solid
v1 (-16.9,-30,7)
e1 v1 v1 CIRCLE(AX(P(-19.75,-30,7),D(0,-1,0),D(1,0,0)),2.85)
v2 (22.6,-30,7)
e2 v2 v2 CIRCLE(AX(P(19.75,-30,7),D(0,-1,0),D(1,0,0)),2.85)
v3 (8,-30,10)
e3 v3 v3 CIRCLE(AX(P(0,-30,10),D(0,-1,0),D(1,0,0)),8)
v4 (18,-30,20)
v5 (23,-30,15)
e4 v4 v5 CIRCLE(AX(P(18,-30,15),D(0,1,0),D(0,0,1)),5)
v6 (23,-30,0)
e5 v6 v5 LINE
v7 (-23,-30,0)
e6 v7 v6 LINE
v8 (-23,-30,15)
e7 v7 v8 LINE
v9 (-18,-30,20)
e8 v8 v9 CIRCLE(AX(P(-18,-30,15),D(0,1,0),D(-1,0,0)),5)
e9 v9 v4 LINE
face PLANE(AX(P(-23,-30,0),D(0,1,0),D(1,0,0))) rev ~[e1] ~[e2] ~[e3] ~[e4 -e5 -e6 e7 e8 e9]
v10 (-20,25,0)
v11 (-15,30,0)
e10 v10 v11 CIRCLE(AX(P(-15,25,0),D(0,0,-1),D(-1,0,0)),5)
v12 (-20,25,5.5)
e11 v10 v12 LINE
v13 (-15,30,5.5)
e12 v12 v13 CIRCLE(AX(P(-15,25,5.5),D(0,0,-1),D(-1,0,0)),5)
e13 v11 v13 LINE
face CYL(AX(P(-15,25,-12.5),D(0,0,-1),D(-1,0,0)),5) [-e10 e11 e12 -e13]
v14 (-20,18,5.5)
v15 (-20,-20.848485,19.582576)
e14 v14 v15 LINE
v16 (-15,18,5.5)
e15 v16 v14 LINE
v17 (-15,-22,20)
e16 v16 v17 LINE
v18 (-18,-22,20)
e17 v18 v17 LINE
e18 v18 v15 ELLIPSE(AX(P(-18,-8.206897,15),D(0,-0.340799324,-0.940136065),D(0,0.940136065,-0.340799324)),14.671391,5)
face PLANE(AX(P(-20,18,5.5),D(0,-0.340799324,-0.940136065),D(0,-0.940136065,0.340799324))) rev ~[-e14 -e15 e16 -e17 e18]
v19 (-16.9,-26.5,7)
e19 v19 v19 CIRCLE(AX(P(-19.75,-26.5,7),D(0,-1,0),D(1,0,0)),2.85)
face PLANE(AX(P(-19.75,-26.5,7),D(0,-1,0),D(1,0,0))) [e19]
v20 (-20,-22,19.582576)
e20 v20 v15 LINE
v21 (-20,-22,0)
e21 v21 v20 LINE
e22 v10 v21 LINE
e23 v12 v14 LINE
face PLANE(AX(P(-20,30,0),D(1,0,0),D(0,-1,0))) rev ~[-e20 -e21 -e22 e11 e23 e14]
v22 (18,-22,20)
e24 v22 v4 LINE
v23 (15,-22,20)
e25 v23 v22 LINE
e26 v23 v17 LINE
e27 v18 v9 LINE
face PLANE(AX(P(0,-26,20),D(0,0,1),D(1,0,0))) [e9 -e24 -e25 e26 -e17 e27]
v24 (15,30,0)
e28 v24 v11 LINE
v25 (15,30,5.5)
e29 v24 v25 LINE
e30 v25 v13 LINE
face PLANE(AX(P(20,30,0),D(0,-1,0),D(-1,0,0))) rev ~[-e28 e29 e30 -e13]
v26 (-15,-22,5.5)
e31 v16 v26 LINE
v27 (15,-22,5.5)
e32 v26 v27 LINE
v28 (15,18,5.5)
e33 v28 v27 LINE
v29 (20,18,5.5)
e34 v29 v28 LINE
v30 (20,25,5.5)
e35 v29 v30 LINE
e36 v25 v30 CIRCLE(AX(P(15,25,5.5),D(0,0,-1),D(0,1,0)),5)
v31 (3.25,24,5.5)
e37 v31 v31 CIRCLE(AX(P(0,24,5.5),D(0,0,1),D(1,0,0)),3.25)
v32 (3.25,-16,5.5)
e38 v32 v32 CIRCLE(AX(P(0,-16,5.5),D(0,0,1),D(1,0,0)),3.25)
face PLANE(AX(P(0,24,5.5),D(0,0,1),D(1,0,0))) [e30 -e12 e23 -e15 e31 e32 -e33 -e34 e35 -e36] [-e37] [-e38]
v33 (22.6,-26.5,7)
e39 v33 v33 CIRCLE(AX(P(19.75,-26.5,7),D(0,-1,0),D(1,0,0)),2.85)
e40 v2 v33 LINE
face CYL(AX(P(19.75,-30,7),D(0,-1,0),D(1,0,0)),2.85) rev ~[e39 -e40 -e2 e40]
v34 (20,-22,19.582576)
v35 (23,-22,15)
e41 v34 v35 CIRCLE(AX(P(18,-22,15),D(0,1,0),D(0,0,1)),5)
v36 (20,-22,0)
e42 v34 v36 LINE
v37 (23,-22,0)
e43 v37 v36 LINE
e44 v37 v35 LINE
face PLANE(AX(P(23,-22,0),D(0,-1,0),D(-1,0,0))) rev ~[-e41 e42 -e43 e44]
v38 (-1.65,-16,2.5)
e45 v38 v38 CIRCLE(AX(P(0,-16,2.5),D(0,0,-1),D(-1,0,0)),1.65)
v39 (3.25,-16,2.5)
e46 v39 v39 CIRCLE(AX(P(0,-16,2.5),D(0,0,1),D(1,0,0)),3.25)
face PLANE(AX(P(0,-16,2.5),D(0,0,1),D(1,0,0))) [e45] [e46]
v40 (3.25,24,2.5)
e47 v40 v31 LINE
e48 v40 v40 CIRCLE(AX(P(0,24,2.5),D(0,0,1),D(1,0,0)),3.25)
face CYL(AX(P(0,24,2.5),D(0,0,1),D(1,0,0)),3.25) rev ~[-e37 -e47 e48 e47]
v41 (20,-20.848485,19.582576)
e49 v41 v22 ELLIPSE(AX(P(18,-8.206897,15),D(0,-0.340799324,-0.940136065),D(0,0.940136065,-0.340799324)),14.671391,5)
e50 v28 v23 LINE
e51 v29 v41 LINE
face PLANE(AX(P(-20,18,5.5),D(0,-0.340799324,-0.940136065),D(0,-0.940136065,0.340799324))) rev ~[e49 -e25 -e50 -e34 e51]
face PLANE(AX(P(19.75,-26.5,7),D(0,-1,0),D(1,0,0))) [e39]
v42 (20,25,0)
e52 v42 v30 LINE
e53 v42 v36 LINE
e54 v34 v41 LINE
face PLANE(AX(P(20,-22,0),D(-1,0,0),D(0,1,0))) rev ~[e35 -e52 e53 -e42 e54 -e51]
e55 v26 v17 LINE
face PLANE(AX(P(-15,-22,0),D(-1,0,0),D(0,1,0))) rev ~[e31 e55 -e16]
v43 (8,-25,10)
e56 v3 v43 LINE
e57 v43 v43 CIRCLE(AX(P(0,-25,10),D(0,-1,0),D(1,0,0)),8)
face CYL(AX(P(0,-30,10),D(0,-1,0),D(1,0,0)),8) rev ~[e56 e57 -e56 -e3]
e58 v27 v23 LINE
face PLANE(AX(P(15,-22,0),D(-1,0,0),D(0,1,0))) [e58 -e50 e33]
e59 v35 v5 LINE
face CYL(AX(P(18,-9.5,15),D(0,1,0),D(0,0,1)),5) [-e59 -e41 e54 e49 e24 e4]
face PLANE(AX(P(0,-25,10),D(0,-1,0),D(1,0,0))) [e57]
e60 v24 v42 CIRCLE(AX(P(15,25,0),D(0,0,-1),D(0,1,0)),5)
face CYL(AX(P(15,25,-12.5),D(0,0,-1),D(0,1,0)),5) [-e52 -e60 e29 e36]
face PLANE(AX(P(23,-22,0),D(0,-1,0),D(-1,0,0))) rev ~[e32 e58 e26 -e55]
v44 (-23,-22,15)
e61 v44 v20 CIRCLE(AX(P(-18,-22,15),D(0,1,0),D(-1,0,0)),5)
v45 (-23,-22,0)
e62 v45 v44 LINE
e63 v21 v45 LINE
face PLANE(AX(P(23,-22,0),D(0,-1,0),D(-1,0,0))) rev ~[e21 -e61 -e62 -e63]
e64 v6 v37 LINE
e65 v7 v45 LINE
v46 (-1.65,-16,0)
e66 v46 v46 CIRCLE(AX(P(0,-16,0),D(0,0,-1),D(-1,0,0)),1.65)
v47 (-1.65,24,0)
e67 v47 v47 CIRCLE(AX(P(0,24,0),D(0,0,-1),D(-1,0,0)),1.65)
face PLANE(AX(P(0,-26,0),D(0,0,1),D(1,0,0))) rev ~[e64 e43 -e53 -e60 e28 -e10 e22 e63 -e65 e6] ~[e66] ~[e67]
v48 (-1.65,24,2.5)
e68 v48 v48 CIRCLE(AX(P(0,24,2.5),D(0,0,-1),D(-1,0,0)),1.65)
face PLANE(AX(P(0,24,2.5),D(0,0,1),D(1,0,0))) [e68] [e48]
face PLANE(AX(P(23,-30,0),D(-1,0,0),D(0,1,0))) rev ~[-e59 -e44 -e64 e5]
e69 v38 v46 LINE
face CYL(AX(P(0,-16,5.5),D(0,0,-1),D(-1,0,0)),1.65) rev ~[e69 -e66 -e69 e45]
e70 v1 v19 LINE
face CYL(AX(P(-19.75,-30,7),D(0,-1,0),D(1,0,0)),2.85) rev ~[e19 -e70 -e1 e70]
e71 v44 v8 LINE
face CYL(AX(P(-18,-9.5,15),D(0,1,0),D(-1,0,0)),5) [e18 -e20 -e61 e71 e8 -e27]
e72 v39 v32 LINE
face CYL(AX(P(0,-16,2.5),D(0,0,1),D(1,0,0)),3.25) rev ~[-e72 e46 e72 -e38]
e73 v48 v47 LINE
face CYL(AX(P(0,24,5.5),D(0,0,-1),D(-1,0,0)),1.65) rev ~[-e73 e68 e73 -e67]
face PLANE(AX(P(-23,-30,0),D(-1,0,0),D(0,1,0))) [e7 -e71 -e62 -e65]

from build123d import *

# Parameters (mm, degrees)
F0_W           = 3
F0_H           = 8
F1_DEPTH       = 20
F0_W_2         = 30
F0_H_2         = 12
F0_H_3         = 40
F0_W_3         = 5
F2_DEPTH       = 5.5
F3_DEPTH       = 20
F5_DEPTH       = 43.001
F7_D           = 3.3
F7_DEPTH       = 13.5002857143
F7_CBORE_D     = 6.5
F7_CBORE_DEPTH = 3
F7_TIP         = 0.9914200214
F8_R           = 8
F9_DEPTH       = 5
F8_R_2         = 2.85
F10_DEPTH      = 3.5
F11_T1_DEPTH   = 30.5
F11_T3_DEPTH   = 33


# Not quite as in the source:
# - a fillet or chamfer that OpenCascade refuses, or shapes differently, is made with other operations: its cross-section is extruded or revolved along the edge and cut away or added


with BuildPart() as f1:
    # F0 (on Top) → F1 (new body)
    with BuildSketch(Plane.XY):
        Polygon((20, -30), (20, -22), (15, -22), (-15, -22), (-20, -22), (-20, -30), align=None)
        with Locations((-21.5, -26)):
            Rectangle(F0_W, F0_H)
        with Locations((21.5, -26)):
            Rectangle(F0_W, F0_H)
    extrude(amount=F1_DEPTH)

    # F0 (on Top) → F2 (join)
    with BuildSketch(Plane.XY):
        with Locations((0, 24)):
            Rectangle(F0_W_2, F0_H_2)
        with Locations((0, -2)):
            Rectangle(F0_W_2, F0_H_3)
        with Locations((-17.5, 24)):
            Rectangle(F0_W_3, F0_H_2)
        with Locations((-17.5, -2)):
            Rectangle(F0_W_3, F0_H_3)
        with Locations((17.5, 24)):
            Rectangle(F0_W_3, F0_H_2)
        with Locations((17.5, -2)):
            Rectangle(F0_W_3, F0_H_3)
    extrude(amount=F2_DEPTH)

    # F0 (on Top) → F3 (join)
    with BuildSketch(Plane.XY):
        with Locations((-17.5, -2)):
            Rectangle(F0_W_3, F0_H_3)
        with Locations((17.5, -2)):
            Rectangle(F0_W_3, F0_H_3)
    extrude(amount=F3_DEPTH)

    # F4 (on face) → F5 (cut, through all)
    with BuildSketch(Plane(origin=(-20, 0, 0), x_dir=(0, -1, 0), z_dir=(-1, 0, 0))):
        Polygon((-18, 20), (-18, 5.5), (22, 20), align=None)
    extrude(amount=-F5_DEPTH, mode=Mode.SUBTRACT)

    # F7
    with Locations(Plane.XY.offset(5.5)):
        with Locations((0, 24), (0, -16)):
            CounterBoreHole(F7_D / 2, F7_CBORE_D / 2, F7_CBORE_DEPTH, depth=F7_DEPTH)
            with Locations((0, 0, -(F7_DEPTH + F7_TIP / 2))):  # 118° drill point
                Cone(0, F7_D / 2, F7_TIP, mode=Mode.SUBTRACT)

    # F8 (on face) → F9 (cut)
    with BuildSketch(Plane.XZ.offset(30)):
        with Locations((0, 10)):
            Circle(F8_R)
    extrude(amount=-F9_DEPTH, mode=Mode.SUBTRACT)

    # F8 (on face) → F10 (cut)
    with BuildSketch(Plane.XZ.offset(30)):
        with Locations((-19.75, 7)):
            Circle(F8_R_2)
        with Locations((19.75, 7)):
            Circle(F8_R_2)
    extrude(amount=-F10_DEPTH, mode=Mode.SUBTRACT)

    # F11: fillet of radius 5 on 4 edges, made by hand

    # F11_s2 → F11_t1 (cut)
    with BuildSketch(Plane.XY.offset(-12.5)):
        with BuildLine():
            ThreePointArc((15, 30), (18.5355339059, 28.5355339059), (20, 25))
            Line((20, 25), (20, 30))
            Line((20, 30), (15, 30))
        make_face()
        with BuildLine():
            ThreePointArc((-20, 25), (-18.5355339059, 28.5355339059), (-15, 30))
            Line((-15, 30), (-20, 30))
            Line((-20, 30), (-20, 25))
        make_face()
    extrude(amount=F11_T1_DEPTH, mode=Mode.SUBTRACT)

    # F11_s4 → F11_t3 (cut)
    with BuildSketch(Plane.XZ.offset(9.5)):
        with BuildLine():
            ThreePointArc((-23, 15), (-21.5355339059, 18.5355339059), (-18, 20))
            Line((-18, 20), (-23, 20))
            Line((-23, 20), (-23, 15))
        make_face()
        with BuildLine():
            ThreePointArc((18, 20), (21.5355339059, 18.5355339059), (23, 15))
            Line((23, 15), (23, 20))
            Line((23, 20), (18, 20))
        make_face()
    extrude(amount=F11_T3_DEPTH, mode=Mode.SUBTRACT)


solid = f1.part
